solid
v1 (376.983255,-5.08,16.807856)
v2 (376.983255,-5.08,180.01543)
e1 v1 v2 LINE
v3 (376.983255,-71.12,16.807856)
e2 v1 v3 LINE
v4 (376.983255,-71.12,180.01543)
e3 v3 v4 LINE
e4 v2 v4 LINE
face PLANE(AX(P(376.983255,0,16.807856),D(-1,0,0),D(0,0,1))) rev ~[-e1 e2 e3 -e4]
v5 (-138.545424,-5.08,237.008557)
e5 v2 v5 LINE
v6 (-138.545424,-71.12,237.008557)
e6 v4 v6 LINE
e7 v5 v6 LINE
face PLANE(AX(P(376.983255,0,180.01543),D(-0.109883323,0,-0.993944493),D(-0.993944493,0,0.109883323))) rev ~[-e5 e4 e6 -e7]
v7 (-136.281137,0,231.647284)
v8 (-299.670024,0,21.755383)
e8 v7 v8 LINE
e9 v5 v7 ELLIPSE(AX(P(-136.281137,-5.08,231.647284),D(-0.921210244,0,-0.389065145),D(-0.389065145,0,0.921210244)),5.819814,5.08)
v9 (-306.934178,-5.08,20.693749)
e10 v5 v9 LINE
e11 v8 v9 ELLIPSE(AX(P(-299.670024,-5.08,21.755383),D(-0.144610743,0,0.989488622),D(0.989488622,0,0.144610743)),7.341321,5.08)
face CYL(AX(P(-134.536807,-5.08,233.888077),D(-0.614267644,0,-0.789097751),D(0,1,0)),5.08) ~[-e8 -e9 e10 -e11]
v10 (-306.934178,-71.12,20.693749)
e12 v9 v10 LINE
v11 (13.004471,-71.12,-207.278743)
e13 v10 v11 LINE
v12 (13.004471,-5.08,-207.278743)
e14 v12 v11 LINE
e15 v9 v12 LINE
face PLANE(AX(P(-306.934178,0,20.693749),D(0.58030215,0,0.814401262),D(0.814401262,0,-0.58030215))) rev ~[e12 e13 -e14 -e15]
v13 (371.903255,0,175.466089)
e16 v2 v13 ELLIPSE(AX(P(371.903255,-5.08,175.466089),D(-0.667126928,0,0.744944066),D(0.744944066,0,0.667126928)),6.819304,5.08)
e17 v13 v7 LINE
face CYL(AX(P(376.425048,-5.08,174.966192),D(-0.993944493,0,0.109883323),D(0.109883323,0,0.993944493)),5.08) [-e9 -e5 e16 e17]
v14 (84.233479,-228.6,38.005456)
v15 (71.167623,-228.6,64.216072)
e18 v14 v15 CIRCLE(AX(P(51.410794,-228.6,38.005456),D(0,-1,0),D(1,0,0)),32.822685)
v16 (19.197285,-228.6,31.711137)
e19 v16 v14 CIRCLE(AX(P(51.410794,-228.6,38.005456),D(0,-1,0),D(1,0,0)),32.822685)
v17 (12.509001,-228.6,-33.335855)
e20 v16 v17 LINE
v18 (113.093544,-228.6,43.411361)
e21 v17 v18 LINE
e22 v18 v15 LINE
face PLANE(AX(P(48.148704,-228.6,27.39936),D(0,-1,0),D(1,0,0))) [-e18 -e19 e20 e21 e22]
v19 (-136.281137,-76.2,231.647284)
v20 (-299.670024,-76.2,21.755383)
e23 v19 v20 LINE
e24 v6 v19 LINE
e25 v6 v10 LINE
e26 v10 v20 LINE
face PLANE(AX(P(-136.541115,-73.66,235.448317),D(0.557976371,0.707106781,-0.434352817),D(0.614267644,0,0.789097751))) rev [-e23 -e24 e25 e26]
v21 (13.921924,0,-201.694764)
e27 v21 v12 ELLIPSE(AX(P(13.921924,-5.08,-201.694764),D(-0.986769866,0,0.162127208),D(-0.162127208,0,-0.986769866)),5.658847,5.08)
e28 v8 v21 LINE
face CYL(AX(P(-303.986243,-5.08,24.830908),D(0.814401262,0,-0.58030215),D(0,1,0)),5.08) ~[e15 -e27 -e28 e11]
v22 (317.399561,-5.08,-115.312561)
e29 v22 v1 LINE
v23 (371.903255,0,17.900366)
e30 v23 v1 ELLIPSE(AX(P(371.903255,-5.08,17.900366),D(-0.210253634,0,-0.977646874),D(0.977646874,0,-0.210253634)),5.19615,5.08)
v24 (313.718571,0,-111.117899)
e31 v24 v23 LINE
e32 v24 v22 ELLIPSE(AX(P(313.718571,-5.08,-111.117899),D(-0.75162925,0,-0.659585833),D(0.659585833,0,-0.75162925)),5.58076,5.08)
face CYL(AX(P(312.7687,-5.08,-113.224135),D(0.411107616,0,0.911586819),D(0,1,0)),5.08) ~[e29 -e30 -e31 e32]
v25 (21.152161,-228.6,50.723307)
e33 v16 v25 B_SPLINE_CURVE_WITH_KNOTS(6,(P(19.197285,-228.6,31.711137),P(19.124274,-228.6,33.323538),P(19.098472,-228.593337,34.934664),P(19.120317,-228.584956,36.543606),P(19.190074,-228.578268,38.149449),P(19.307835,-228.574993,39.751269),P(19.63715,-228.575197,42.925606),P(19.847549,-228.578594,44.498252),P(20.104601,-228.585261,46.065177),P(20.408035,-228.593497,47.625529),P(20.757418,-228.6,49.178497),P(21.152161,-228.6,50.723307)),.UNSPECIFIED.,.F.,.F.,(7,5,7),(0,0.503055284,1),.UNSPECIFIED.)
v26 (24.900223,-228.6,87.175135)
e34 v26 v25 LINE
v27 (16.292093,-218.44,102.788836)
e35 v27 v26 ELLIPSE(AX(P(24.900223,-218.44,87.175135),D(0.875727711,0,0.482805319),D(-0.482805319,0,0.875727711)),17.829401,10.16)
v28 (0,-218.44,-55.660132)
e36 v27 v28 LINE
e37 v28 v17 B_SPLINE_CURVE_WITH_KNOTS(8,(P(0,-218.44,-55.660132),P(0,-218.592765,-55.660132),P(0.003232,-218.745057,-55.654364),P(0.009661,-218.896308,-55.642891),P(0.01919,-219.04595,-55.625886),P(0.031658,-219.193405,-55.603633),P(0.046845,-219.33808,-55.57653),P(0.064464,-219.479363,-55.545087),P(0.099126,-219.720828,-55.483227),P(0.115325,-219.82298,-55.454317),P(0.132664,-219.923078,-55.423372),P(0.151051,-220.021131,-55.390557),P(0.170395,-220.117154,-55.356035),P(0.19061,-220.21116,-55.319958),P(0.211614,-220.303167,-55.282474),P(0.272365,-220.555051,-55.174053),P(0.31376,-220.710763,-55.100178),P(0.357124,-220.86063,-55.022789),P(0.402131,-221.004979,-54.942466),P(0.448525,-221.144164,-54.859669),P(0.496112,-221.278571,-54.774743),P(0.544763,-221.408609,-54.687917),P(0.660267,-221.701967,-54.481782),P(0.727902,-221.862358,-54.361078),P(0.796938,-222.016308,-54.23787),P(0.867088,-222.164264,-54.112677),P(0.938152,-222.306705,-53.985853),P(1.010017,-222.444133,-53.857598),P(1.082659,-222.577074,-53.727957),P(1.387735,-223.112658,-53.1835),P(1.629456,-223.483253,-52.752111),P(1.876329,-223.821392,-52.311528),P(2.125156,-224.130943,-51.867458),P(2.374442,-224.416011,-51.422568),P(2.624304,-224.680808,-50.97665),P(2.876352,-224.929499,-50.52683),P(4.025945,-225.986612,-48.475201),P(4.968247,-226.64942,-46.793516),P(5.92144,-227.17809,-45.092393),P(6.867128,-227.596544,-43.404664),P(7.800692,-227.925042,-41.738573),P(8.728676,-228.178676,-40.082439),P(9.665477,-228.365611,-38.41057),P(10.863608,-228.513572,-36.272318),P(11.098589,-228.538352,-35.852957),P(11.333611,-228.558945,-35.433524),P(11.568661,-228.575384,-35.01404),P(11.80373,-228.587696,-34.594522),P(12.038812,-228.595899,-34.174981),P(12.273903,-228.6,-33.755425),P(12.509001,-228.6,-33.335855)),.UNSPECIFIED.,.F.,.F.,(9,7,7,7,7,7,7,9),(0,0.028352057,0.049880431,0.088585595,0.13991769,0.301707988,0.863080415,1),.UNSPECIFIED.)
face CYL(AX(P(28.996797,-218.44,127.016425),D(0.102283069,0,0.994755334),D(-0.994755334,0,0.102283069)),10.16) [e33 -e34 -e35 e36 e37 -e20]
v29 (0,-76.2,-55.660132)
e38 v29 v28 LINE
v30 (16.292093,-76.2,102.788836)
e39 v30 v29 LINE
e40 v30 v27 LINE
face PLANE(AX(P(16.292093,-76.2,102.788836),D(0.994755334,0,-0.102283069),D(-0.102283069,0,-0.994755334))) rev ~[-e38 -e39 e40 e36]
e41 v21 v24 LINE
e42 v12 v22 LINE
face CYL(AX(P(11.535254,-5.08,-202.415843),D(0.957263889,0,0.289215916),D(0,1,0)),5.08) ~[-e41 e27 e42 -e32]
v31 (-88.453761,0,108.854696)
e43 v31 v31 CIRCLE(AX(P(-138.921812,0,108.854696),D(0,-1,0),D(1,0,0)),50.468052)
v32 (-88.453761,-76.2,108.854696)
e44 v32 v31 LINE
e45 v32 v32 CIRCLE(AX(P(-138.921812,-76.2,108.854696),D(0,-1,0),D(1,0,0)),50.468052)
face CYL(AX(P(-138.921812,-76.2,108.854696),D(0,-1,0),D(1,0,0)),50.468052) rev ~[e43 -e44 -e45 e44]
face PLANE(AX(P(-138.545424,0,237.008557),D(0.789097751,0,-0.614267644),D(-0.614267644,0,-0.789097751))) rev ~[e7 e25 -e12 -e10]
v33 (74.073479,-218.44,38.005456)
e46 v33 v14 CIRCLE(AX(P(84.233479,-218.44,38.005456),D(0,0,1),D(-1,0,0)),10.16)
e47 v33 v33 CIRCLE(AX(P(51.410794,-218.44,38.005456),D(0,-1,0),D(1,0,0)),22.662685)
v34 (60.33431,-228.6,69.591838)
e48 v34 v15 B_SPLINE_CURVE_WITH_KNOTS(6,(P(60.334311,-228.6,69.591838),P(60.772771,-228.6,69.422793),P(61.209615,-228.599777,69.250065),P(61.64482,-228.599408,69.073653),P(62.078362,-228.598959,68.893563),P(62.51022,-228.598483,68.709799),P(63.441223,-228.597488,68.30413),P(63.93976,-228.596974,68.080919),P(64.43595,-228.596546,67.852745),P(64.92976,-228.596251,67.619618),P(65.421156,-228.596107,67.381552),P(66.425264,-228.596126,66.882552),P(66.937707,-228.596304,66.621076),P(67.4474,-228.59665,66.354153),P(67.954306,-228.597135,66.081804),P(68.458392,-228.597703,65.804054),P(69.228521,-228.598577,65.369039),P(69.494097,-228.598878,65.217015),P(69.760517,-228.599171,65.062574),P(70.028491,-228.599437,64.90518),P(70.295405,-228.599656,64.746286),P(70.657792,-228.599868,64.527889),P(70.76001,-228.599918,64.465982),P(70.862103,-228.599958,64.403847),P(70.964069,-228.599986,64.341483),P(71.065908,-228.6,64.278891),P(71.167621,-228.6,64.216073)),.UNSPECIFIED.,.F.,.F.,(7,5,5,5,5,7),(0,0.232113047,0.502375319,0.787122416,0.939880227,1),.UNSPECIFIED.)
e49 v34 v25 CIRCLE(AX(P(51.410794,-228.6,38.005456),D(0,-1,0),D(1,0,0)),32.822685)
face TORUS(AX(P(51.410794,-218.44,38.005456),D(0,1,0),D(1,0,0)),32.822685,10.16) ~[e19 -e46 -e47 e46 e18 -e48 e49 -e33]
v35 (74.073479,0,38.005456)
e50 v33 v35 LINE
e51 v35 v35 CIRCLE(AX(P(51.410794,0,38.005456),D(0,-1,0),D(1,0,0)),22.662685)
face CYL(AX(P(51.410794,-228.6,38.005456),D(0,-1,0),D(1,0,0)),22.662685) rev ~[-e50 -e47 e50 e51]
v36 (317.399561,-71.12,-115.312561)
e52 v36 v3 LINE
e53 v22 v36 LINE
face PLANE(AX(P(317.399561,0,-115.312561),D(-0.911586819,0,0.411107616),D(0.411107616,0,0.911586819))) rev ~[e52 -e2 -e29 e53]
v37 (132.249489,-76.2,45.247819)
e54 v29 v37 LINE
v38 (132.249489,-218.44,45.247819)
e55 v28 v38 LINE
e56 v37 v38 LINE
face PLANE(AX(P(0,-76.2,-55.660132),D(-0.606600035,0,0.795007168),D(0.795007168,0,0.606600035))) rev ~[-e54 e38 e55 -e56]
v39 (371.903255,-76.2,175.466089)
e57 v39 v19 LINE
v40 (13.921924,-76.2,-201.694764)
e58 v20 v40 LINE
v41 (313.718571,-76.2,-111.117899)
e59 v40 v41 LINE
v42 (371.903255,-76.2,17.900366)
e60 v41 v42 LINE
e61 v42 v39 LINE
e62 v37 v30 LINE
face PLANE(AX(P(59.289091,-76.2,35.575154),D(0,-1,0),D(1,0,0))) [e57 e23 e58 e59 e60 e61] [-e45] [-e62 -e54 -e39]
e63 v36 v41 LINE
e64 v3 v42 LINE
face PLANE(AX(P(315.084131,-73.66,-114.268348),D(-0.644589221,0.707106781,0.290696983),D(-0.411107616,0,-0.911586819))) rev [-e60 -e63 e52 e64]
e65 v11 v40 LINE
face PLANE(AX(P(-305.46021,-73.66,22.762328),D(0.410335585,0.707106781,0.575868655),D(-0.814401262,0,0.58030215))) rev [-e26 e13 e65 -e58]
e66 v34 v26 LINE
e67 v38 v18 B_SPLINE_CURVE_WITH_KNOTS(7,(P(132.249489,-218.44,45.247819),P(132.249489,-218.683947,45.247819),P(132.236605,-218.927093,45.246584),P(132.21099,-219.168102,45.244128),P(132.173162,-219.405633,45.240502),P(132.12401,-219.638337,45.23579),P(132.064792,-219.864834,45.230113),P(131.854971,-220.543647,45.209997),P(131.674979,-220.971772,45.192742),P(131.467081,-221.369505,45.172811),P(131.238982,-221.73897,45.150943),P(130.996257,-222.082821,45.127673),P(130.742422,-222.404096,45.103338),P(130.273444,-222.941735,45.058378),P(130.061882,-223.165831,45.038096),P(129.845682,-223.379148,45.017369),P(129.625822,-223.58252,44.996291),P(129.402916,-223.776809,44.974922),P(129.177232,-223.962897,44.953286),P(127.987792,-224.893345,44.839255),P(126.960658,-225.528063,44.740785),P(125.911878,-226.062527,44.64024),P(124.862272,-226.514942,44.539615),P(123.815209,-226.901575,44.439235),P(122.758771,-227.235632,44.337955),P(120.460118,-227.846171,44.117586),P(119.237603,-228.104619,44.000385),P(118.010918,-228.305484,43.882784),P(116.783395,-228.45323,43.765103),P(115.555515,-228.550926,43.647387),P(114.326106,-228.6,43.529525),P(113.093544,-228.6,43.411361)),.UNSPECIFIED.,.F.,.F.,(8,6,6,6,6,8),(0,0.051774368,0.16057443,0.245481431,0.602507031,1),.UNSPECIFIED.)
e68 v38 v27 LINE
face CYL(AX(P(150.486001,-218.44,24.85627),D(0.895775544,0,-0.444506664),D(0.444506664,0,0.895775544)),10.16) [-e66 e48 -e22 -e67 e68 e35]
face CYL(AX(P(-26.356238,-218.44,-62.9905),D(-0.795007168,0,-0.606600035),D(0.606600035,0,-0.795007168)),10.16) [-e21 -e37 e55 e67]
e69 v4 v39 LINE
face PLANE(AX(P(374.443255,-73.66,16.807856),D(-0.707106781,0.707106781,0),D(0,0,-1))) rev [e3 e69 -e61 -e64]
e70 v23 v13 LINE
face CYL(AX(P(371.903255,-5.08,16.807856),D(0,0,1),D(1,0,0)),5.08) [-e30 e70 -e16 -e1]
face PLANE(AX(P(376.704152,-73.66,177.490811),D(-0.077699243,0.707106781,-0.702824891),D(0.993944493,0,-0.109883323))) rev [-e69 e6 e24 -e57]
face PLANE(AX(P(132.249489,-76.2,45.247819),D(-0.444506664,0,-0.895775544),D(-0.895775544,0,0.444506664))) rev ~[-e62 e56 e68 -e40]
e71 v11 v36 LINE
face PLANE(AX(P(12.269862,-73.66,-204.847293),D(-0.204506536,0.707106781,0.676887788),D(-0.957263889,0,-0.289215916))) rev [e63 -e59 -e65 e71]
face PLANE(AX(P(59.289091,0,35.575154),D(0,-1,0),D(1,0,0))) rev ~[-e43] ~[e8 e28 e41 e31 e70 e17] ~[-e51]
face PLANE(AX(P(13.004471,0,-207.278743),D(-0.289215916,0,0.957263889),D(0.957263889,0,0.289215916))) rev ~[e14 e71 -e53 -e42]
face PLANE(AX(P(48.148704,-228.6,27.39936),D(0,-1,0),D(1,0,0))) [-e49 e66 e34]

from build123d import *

# Parameters (mm, degrees)
F1_DEPTH     = 76.2
F2_SIZE      = 5.08
F4_DEPTH     = 152.4
F5_R         = 50.4680515056
F6_DEPTH     = 76.2
F7_R         = 22.662684834
F8_DEPTH     = 228.6
F9_R         = 5.08
F10_T1_DEPTH = 217.1500590573
F10_T3_DEPTH = 210.0843614146
F10_T5_DEPTH = 180.2491648874


# Not quite as in the source:
# - a fillet or chamfer that OpenCascade refuses, or shapes differently, is made with other operations: its cross-section is extruded or revolved along the edge and cut away or added


with BuildPart() as f1:
    # F0 (on Front) → F1 (new body)
    with BuildSketch(Plane.XZ):
        Polygon((376.9832551479, 180.0154298544), (-138.5454237461, 237.0085567236), (-306.9341778755, 20.6937491894), (13.0044706166, -207.2787433863), (317.3995614052, -115.3125613928), (376.9832551479, 16.8078560382), align=None)
    extrude(amount=F1_DEPTH)

    # F2
    f2_edges = [f1.edges().sort_by_distance(p)[0] for p in [
        (-146.964854, -76.2, -93.292497),
        (165.202016, -76.2, -161.295652),
        (347.191408, -76.2, -49.252353),
        (376.983255, -76.2, 98.411643),
        (119.218916, -76.2, 208.511993),
        (-222.739801, -76.2, 128.851153),
    ]]
    chamfer(f2_edges, length=F2_SIZE)

    # F3 (on face) → F4 (join)
    with BuildSketch(Plane.XZ.offset(76.2)):
        Polygon((132.2494894266, 45.2478192747), (16.2920933217, 102.7888357639), (0, -55.6601323187), align=None)
    extrude(amount=F4_DEPTH)

    # F5 (on face) → F6 (cut)
    with BuildSketch(Plane.XZ.offset(76.2)):
        with Locations((-138.9218121767, 108.8546961546)):
            Circle(F5_R)
    extrude(amount=-F6_DEPTH, mode=Mode.SUBTRACT)

    # F7 (on face) → F8 (cut)
    with BuildSketch(Plane.XZ.offset(228.6)):
        with Locations((51.4107942581, 38.0054563284)):
            Circle(F7_R)
    extrude(amount=-F8_DEPTH, mode=Mode.SUBTRACT)

    # F9
    f9_edges = [f1.edges().sort_by_distance(p)[0] for p in [
        (-146.964854, 0, -93.292497),
        (165.202016, 0, -161.295652),
        (347.191408, 0, -49.252353),
        (376.983255, 0, 98.411643),
        (119.218916, 0, 208.511993),
        (-222.739801, 0, 128.851153),
    ]]
    fillet(f9_edges, radius=F9_R)

    # F10: fillet of radius 10.16 on 4 edges, made by hand

    # F10_s2 → F10_t1 (cut)
    with BuildSketch(Plane(origin=(-47.0353574765, 0, -35.8885436609), x_dir=(0, 1, 0), z_dir=(0.7950071685, 0, 0.6066000347))):
        with BuildLine():
            ThreePointArc((-218.44, -44.2502041916), (-225.6242048969, -41.2744090884), (-228.6, -34.0902041916))
            Line((-228.6, -34.0902041916), (-228.6, -44.2502041916))
            Line((-228.6, -44.2502041916), (-218.44, -44.2502041916))
        make_face()
    extrude(amount=F10_T1_DEPTH, mode=Mode.SUBTRACT)

    # F10_s4 → F10_t3 (cut)
    with BuildSketch(Plane(origin=(13.2268524744, 0, 128.6379278687), x_dir=(0, 1, 0), z_dir=(-0.102283069, 0, -0.9947553336))):
        with BuildLine():
            ThreePointArc((-218.44, 5.6930891519), (-225.6242048969, 8.668884255), (-228.6, 15.8530891519))
            Line((-228.6, 15.8530891519), (-228.6, 5.6930891519))
            Line((-228.6, 5.6930891519), (-218.44, 5.6930891519))
        make_face()
    extrude(amount=F10_T3_DEPTH, mode=Mode.SUBTRACT)

    # F10_s6 → F10_t5 (cut)
    with BuildSketch(Plane(origin=(110.8548223357, 0, -55.0089892857), x_dir=(0, 1, 0), z_dir=(-0.8957755441, 0, 0.4445066644))):
        with BuildLine():
            ThreePointArc((-218.44, -99.3176693375), (-225.6242048969, -96.3418742344), (-228.6, -89.1576693375))
            Line((-228.6, -89.1576693375), (-228.6, -99.3176693375))
            Line((-228.6, -99.3176693375), (-218.44, -99.3176693375))
        make_face()
    extrude(amount=F10_T5_DEPTH, mode=Mode.SUBTRACT)

    # F10_s7 → F10_t8 (revolve, cut)
    with BuildSketch(Plane.XY.offset(38.0054563284)):
        with BuildLine():
            ThreePointArc((74.0734790921, -218.44), (77.0492741953, -225.6242048969), (84.2334790921, -228.6))
            Line((84.2334790921, -228.6), (74.0734790921, -228.6))
            Line((74.0734790921, -228.6), (74.0734790921, -218.44))
        make_face()
    revolve(axis=Axis((51.4107942581, -228.6, 38.0054563284), (0, -1, 0)), mode=Mode.SUBTRACT)


solid = f1.part
